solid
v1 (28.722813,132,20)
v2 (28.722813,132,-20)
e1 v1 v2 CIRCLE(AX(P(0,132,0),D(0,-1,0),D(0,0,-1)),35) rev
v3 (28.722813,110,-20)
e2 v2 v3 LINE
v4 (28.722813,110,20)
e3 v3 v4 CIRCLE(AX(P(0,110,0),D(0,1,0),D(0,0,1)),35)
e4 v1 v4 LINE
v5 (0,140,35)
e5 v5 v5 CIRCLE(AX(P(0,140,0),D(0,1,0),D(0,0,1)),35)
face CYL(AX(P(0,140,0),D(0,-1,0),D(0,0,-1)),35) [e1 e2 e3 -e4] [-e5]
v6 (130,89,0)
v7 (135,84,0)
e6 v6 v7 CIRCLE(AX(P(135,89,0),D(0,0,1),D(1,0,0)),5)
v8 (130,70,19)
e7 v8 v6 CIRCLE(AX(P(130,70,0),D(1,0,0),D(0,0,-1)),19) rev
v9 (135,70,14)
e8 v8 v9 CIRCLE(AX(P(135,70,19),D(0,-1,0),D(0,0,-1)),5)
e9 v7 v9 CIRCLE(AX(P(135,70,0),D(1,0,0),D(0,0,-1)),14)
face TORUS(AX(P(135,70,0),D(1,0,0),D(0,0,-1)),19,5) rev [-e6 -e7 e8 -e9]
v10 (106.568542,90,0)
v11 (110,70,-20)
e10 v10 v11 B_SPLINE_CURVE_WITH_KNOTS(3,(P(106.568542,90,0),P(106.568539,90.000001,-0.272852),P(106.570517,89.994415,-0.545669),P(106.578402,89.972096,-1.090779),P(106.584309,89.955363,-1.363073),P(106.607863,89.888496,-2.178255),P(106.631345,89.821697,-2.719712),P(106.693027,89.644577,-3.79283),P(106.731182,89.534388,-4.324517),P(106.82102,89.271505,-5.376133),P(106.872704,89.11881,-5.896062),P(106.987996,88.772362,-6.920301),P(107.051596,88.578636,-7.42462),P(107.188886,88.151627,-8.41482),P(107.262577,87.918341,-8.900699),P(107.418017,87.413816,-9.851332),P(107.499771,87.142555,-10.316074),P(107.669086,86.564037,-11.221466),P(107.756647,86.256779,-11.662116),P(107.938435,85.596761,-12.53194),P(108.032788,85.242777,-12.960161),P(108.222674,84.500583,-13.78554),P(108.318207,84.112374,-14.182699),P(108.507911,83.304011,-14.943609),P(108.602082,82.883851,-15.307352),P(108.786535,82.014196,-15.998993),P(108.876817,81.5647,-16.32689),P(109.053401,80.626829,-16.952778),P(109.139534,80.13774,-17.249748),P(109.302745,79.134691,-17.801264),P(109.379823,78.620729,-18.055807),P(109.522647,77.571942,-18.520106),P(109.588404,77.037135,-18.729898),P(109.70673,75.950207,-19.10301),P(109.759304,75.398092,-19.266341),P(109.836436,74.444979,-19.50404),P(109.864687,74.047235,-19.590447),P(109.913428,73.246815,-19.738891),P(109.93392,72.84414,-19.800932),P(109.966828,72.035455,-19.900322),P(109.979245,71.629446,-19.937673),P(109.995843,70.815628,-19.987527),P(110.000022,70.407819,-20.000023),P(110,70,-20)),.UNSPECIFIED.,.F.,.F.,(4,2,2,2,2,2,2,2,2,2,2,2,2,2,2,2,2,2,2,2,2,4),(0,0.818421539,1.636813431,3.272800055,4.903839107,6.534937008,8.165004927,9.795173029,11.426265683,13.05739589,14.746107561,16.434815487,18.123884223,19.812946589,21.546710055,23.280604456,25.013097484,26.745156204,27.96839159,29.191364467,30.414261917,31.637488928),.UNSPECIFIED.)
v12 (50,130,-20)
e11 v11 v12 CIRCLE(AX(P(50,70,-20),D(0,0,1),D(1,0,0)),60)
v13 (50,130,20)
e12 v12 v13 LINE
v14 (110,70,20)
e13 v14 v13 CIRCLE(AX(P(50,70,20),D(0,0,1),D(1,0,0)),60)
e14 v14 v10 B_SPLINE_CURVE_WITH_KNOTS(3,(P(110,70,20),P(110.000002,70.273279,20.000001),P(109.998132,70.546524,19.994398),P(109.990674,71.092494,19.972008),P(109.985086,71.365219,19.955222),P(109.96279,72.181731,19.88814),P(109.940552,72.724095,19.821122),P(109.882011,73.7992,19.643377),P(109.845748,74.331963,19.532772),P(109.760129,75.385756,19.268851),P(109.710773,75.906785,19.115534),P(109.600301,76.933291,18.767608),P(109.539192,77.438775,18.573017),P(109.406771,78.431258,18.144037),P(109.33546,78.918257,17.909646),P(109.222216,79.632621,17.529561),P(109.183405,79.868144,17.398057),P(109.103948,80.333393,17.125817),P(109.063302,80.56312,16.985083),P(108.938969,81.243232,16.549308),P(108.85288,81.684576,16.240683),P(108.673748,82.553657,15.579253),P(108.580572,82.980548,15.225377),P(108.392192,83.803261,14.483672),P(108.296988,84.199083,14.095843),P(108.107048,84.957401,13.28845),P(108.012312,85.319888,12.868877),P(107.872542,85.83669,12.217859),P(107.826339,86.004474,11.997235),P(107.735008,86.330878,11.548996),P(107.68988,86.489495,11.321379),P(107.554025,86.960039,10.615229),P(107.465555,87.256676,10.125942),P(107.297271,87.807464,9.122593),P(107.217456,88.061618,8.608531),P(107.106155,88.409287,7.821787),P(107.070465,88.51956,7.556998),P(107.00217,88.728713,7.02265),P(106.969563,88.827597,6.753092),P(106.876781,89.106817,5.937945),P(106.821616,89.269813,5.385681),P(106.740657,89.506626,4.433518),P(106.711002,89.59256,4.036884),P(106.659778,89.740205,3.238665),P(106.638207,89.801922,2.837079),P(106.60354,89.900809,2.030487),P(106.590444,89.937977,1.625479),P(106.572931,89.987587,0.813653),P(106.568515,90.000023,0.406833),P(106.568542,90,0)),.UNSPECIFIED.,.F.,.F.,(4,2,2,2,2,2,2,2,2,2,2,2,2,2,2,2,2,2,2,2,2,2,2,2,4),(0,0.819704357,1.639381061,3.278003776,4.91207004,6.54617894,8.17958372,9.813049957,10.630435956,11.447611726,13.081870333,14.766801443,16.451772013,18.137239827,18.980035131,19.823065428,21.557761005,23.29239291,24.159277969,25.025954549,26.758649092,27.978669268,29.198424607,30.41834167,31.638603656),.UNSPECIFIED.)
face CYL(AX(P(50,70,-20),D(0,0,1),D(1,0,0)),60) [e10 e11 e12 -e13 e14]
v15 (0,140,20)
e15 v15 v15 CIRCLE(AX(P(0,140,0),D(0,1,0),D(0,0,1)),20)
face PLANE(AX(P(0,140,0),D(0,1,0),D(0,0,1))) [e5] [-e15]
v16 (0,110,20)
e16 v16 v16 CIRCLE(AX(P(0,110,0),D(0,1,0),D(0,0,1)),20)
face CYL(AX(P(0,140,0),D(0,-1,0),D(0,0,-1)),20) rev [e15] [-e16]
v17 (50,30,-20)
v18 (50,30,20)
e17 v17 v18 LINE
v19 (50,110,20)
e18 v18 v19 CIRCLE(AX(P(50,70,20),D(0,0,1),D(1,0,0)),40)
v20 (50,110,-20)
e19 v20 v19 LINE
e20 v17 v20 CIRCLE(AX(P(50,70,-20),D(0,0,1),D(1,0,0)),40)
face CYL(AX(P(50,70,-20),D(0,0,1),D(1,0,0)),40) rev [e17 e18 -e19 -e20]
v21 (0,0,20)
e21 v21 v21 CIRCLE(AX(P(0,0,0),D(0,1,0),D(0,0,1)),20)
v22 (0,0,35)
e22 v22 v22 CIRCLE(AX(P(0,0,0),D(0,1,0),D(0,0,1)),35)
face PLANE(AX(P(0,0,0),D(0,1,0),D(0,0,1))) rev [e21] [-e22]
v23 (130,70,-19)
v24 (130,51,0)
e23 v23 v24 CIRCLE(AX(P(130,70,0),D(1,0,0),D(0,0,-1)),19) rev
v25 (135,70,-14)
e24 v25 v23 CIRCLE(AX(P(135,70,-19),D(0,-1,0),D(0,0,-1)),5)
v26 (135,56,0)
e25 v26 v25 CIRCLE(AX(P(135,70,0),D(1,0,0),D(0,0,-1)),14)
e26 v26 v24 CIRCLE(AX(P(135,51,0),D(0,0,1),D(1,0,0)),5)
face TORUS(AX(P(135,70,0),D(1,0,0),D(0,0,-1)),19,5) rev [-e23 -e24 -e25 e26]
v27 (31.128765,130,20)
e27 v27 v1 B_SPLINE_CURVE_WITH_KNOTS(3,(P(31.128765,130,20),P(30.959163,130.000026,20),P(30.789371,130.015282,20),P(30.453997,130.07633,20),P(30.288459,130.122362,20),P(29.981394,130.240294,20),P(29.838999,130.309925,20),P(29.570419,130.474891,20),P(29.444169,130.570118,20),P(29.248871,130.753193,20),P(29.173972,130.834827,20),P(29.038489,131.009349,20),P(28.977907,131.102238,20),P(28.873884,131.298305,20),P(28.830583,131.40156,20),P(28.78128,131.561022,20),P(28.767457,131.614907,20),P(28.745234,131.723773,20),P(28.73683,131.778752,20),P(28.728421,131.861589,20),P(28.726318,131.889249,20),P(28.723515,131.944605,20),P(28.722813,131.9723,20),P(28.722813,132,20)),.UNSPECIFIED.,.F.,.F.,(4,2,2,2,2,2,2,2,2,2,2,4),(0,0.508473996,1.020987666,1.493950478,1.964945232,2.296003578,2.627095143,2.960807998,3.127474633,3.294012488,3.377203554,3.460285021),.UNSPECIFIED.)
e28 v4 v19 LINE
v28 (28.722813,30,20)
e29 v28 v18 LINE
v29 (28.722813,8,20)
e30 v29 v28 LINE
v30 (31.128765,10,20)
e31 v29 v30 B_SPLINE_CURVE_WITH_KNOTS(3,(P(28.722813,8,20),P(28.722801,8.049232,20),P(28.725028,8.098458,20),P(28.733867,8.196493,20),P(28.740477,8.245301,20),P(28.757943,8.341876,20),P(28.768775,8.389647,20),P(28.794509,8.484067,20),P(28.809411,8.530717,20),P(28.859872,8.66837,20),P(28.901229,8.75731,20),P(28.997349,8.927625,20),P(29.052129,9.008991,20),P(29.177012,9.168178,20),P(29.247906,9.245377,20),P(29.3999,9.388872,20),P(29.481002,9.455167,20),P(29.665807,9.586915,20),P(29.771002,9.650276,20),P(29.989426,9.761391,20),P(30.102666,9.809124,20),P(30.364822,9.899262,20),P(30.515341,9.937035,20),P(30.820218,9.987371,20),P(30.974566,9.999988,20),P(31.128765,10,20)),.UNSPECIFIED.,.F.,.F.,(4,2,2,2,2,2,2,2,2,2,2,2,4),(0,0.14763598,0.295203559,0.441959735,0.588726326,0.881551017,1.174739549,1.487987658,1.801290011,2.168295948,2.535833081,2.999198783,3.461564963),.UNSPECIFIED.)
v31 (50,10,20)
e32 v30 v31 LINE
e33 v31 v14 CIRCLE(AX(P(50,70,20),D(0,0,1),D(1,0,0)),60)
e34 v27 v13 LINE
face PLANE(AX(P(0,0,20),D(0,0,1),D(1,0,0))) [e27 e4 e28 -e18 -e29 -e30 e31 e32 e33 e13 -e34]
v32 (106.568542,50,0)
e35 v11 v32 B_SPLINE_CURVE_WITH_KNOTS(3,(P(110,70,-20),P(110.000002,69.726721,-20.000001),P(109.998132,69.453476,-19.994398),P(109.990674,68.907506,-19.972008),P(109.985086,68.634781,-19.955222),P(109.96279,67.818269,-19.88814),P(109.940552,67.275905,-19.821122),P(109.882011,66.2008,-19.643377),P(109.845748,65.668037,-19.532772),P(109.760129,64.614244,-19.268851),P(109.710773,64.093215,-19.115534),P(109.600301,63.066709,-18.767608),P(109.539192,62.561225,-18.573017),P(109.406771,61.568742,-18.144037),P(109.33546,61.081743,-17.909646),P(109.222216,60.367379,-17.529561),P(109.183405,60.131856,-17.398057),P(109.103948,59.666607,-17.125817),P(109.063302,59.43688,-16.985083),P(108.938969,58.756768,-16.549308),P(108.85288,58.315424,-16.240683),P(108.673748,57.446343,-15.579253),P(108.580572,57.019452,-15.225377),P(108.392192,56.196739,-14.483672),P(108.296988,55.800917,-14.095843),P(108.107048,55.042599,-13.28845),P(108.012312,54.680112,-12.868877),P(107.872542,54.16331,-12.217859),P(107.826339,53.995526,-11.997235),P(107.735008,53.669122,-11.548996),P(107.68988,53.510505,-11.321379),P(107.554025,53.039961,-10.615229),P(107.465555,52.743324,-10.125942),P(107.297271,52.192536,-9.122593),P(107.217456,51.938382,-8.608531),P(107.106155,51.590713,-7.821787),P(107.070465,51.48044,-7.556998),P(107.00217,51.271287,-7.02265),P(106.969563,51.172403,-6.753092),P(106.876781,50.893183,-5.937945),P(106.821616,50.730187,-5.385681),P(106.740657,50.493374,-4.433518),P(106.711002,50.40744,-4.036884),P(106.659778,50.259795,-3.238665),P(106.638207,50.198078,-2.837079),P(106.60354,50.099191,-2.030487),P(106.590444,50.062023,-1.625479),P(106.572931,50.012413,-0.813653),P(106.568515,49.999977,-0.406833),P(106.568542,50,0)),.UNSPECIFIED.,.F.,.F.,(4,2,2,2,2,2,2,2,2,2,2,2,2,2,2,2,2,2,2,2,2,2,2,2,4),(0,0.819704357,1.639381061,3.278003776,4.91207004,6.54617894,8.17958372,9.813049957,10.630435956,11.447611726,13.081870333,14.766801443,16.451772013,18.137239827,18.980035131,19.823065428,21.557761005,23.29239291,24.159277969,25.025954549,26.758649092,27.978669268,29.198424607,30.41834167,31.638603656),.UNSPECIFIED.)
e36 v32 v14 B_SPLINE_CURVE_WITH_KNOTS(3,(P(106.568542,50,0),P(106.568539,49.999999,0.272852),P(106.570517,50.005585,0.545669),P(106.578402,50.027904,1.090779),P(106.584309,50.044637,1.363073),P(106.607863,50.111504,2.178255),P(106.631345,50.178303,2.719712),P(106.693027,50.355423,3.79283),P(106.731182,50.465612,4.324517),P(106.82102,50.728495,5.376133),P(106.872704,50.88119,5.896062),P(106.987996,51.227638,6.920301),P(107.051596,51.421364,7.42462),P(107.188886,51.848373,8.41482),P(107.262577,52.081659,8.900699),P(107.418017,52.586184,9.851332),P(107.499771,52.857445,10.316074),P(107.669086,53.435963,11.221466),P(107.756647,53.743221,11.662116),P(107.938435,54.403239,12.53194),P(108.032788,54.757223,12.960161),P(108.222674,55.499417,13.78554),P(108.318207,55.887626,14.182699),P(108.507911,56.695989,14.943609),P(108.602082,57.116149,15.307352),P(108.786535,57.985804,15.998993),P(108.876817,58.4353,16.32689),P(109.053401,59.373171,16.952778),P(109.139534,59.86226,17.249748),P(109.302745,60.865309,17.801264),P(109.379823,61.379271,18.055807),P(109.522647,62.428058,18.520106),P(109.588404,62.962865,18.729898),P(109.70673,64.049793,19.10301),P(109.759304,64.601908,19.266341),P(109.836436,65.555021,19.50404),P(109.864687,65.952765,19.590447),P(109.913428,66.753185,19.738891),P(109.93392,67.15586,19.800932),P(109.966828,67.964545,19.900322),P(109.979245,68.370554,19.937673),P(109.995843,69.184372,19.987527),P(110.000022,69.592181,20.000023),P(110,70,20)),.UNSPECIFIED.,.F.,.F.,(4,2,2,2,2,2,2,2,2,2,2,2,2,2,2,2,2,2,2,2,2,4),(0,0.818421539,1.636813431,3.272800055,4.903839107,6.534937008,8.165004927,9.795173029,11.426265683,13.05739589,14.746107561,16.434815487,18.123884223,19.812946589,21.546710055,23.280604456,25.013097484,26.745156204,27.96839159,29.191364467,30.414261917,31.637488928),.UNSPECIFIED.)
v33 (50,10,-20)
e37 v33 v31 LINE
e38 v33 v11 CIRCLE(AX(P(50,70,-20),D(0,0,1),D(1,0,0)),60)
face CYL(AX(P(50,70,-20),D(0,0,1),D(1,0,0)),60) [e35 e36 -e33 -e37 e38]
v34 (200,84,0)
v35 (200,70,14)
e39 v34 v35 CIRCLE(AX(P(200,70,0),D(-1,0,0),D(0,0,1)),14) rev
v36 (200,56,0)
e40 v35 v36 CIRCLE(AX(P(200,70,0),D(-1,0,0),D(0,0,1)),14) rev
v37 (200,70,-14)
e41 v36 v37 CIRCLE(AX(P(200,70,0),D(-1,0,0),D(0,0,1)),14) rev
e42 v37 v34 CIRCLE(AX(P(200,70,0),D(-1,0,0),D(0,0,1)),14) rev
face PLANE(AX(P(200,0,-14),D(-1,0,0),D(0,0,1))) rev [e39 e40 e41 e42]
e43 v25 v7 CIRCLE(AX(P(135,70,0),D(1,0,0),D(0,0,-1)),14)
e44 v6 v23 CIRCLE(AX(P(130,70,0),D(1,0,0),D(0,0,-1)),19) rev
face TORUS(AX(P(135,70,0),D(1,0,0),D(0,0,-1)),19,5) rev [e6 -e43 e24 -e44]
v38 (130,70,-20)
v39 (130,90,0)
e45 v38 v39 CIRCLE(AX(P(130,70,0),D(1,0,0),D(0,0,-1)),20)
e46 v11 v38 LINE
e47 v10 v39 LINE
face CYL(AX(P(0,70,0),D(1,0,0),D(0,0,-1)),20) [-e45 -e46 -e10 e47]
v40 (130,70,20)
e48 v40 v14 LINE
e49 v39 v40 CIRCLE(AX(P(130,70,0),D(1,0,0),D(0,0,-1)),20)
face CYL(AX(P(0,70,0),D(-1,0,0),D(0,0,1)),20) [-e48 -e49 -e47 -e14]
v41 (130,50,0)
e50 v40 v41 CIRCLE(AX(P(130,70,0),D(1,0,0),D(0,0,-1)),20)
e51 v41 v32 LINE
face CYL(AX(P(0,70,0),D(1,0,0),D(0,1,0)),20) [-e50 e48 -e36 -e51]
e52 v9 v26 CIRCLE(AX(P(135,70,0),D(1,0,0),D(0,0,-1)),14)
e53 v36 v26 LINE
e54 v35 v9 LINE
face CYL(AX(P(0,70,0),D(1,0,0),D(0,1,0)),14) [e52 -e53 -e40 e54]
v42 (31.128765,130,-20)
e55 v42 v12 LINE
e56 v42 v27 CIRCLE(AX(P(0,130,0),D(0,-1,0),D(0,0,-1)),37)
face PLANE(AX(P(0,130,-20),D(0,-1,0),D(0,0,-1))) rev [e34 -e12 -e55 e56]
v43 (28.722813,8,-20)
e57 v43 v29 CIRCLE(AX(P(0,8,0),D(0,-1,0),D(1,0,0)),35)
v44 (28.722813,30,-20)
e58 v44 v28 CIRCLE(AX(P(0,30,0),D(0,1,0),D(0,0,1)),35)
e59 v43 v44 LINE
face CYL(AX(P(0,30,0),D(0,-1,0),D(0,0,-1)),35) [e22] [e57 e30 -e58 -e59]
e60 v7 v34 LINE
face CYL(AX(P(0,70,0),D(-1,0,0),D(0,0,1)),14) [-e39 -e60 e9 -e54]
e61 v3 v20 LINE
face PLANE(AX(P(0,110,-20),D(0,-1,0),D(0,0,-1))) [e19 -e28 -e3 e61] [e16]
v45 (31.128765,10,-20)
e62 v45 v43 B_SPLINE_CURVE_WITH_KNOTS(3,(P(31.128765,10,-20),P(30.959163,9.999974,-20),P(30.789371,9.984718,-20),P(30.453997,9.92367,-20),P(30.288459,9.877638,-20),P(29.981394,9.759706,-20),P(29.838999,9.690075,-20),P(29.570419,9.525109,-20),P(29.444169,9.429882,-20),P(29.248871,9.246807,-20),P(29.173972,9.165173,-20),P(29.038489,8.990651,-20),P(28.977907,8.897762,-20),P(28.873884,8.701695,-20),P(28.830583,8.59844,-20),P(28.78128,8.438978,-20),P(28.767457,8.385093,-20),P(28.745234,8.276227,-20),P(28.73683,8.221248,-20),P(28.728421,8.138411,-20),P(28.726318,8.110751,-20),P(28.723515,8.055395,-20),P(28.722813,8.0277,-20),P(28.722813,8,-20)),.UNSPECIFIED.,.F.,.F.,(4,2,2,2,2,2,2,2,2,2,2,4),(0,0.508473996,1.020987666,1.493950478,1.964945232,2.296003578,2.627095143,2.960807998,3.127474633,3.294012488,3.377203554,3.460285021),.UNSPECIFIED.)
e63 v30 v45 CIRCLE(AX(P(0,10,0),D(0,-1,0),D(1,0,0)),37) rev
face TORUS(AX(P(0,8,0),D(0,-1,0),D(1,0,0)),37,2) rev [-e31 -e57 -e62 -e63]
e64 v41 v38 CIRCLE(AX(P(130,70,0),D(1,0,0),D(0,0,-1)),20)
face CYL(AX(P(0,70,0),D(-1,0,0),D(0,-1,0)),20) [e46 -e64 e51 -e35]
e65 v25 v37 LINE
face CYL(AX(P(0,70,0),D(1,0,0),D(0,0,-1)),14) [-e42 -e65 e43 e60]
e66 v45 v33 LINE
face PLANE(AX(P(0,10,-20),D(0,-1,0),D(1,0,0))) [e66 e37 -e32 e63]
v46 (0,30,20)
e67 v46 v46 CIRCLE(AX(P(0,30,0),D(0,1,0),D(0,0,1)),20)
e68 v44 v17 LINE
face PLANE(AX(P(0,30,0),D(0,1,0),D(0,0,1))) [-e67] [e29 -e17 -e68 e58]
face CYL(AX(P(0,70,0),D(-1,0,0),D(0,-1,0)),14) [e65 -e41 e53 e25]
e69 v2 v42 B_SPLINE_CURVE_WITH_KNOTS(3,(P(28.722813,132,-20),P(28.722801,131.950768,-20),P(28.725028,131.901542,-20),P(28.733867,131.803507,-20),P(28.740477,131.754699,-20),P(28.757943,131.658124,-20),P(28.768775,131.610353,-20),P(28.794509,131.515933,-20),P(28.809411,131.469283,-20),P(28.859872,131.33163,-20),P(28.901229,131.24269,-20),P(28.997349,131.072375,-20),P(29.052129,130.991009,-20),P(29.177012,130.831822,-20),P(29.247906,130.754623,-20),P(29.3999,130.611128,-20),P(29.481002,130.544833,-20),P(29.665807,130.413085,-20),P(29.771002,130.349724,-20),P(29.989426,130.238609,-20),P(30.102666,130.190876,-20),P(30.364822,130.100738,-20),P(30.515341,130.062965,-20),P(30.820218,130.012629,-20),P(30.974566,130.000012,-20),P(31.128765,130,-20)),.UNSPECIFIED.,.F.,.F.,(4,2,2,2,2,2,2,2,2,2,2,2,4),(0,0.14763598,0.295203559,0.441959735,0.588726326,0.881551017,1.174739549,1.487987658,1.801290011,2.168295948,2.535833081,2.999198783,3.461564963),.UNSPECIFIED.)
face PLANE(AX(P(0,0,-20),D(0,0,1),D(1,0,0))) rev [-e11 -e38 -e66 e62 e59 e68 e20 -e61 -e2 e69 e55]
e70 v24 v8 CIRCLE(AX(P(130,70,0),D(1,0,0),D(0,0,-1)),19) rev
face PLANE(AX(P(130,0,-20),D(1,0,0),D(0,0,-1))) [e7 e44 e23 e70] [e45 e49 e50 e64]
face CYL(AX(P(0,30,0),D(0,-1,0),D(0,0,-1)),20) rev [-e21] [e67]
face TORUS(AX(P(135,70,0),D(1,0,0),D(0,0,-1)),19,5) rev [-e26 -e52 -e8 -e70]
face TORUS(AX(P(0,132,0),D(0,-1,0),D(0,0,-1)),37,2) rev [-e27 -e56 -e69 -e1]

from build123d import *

# Parameters (mm, degrees)
SKETCH3_R                = 35
SKETCH3_R_2              = 20
BOSS_EXTRUDE1_DEPTH      = 30
LPATTERN2_COUNT          = 2
LPATTERN2_PITCH          = 110
BOSS_EXTRUDE2_DEPTH      = 20
BOSS_EXTRUDE2_DEPTH_BACK = 20
FILLET1_R                = 2
BOSS_EXTRUDE3_DEPTH      = 20
BOSS_EXTRUDE3_DEPTH_BACK = 20
SKETCH6_W                = 40
SKETCH6_H                = 30
BOSS_EXTRUDE4_DEPTH      = 14
BOSS_EXTRUDE4_DEPTH_BACK = 14
SKETCH6_3_W              = 28
SKETCH6_3_H              = 70
FILLET2_R                = 14
FILLET3_R                = 20
FILLET4_R                = 5


with BuildPart() as part:
    # Sketch3 → Boss-Extrude1 (new body)
    with BuildSketch(Plane(origin=(0, 0, 0), x_dir=(1, 0, 0), z_dir=(0, 1, 0))):
        with Locations(Location((0, 0, 0), (0, 0, 270))):
            Circle(SKETCH3_R)
        with Locations(Location((0, 0, 0), (0, 0, 270))):
            Circle(SKETCH3_R_2, mode=Mode.SUBTRACT)
    extrude(amount=BOSS_EXTRUDE1_DEPTH)


with BuildPart() as lpattern2_1:
    # LPattern2: pattern copy
    add(part.part.moved(Location(Vector(0, 1, 0) * (1 * LPATTERN2_PITCH))))


with BuildPart() as part_1:
    add(part.part)

    add(lpattern2_1.part)  # Boss-Extrude2 merges LPattern2_1
    # Sketch5 → Boss-Extrude2 (add, two sides: drawn at the far end of the back side and taken through both)
    with BuildSketch(Plane(origin=(0, 0, 0), x_dir=(0, -1, 0), z_dir=(0, 0, 1)).offset(-BOSS_EXTRUDE2_DEPTH_BACK)):
        with BuildLine():
            Line((-10, 21.3), (-10, 50))
            ThreePointArc((-10, 50), (-70, 110), (-130, 50))
            Line((-130, 50), (-130, 21.3))
            Line((-130, 21.3), (-110, 21.3))
            Line((-110, 21.3), (-110, 50))
            ThreePointArc((-110, 50), (-70, 90), (-30, 50))
            Line((-30, 50), (-30, 21.3))
            Line((-30, 21.3), (-10, 21.3))
        make_face()
    extrude(amount=BOSS_EXTRUDE2_DEPTH + BOSS_EXTRUDE2_DEPTH_BACK)

    # Fillet1
    fillet1_edges = [part_1.edges().sort_by_distance(p)[0] for p in [
        (35, 10, 0),
        (35, 130, 0),
    ]]
    fillet(fillet1_edges, radius=FILLET1_R)

    # Sketch6 → Boss-Extrude3 (add, two sides: drawn at the far end of the back side and taken through both)
    with BuildSketch(Plane(origin=(0, 0, 0), x_dir=(0, -1, 0), z_dir=(0, 0, 1)).offset(-BOSS_EXTRUDE3_DEPTH_BACK)):
        with Locations((-70, 115)):
            Rectangle(SKETCH6_W, SKETCH6_H)
    extrude(amount=BOSS_EXTRUDE3_DEPTH + BOSS_EXTRUDE3_DEPTH_BACK)

    # Sketch6<3> → Boss-Extrude4 (add, two sides: drawn at the far end of the back side and taken through both)
    with BuildSketch(Plane(origin=(0, 0, 0), x_dir=(0, -1, 0), z_dir=(0, 0, 1)).offset(-BOSS_EXTRUDE4_DEPTH_BACK)):
        with Locations((-70, 165)):
            Rectangle(SKETCH6_3_W, SKETCH6_3_H)
    extrude(amount=BOSS_EXTRUDE4_DEPTH + BOSS_EXTRUDE4_DEPTH_BACK)

    # Fillet2
    fillet2_edges = [part_1.edges().sort_by_distance(p)[0] for p in [
        (165, 56, -14),
        (165, 56, 14),
        (165, 84, 14),
        (165, 84, -14),
    ]]
    fillet(fillet2_edges, radius=FILLET2_R - 0.0001)  # a hair under: the kernel refuses the full size

    # Fillet3
    fillet3_edges = [part_1.edges().sort_by_distance(p)[0] for p in [
        (118.284271247, 50, -20),
        (118.284271247, 50, 20),
        (118.284271247, 90, 20),
        (118.284271247, 90, -20),
    ]]
    fillet(fillet3_edges, radius=FILLET3_R - 0.0001)  # a hair under: the kernel refuses the full size

    # Fillet4
    fillet4_edges = [part_1.edges().sort_by_distance(p)[0] for p in [
        (130, 60.100475774, -9.899524226),
        (130, 60.100475774, 9.899524226),
        (130, 79.899524226, 9.899524226),
        (130, 79.899524226, -9.899524226),
    ]]
    fillet(fillet4_edges, radius=FILLET4_R)


solid = part_1.part
